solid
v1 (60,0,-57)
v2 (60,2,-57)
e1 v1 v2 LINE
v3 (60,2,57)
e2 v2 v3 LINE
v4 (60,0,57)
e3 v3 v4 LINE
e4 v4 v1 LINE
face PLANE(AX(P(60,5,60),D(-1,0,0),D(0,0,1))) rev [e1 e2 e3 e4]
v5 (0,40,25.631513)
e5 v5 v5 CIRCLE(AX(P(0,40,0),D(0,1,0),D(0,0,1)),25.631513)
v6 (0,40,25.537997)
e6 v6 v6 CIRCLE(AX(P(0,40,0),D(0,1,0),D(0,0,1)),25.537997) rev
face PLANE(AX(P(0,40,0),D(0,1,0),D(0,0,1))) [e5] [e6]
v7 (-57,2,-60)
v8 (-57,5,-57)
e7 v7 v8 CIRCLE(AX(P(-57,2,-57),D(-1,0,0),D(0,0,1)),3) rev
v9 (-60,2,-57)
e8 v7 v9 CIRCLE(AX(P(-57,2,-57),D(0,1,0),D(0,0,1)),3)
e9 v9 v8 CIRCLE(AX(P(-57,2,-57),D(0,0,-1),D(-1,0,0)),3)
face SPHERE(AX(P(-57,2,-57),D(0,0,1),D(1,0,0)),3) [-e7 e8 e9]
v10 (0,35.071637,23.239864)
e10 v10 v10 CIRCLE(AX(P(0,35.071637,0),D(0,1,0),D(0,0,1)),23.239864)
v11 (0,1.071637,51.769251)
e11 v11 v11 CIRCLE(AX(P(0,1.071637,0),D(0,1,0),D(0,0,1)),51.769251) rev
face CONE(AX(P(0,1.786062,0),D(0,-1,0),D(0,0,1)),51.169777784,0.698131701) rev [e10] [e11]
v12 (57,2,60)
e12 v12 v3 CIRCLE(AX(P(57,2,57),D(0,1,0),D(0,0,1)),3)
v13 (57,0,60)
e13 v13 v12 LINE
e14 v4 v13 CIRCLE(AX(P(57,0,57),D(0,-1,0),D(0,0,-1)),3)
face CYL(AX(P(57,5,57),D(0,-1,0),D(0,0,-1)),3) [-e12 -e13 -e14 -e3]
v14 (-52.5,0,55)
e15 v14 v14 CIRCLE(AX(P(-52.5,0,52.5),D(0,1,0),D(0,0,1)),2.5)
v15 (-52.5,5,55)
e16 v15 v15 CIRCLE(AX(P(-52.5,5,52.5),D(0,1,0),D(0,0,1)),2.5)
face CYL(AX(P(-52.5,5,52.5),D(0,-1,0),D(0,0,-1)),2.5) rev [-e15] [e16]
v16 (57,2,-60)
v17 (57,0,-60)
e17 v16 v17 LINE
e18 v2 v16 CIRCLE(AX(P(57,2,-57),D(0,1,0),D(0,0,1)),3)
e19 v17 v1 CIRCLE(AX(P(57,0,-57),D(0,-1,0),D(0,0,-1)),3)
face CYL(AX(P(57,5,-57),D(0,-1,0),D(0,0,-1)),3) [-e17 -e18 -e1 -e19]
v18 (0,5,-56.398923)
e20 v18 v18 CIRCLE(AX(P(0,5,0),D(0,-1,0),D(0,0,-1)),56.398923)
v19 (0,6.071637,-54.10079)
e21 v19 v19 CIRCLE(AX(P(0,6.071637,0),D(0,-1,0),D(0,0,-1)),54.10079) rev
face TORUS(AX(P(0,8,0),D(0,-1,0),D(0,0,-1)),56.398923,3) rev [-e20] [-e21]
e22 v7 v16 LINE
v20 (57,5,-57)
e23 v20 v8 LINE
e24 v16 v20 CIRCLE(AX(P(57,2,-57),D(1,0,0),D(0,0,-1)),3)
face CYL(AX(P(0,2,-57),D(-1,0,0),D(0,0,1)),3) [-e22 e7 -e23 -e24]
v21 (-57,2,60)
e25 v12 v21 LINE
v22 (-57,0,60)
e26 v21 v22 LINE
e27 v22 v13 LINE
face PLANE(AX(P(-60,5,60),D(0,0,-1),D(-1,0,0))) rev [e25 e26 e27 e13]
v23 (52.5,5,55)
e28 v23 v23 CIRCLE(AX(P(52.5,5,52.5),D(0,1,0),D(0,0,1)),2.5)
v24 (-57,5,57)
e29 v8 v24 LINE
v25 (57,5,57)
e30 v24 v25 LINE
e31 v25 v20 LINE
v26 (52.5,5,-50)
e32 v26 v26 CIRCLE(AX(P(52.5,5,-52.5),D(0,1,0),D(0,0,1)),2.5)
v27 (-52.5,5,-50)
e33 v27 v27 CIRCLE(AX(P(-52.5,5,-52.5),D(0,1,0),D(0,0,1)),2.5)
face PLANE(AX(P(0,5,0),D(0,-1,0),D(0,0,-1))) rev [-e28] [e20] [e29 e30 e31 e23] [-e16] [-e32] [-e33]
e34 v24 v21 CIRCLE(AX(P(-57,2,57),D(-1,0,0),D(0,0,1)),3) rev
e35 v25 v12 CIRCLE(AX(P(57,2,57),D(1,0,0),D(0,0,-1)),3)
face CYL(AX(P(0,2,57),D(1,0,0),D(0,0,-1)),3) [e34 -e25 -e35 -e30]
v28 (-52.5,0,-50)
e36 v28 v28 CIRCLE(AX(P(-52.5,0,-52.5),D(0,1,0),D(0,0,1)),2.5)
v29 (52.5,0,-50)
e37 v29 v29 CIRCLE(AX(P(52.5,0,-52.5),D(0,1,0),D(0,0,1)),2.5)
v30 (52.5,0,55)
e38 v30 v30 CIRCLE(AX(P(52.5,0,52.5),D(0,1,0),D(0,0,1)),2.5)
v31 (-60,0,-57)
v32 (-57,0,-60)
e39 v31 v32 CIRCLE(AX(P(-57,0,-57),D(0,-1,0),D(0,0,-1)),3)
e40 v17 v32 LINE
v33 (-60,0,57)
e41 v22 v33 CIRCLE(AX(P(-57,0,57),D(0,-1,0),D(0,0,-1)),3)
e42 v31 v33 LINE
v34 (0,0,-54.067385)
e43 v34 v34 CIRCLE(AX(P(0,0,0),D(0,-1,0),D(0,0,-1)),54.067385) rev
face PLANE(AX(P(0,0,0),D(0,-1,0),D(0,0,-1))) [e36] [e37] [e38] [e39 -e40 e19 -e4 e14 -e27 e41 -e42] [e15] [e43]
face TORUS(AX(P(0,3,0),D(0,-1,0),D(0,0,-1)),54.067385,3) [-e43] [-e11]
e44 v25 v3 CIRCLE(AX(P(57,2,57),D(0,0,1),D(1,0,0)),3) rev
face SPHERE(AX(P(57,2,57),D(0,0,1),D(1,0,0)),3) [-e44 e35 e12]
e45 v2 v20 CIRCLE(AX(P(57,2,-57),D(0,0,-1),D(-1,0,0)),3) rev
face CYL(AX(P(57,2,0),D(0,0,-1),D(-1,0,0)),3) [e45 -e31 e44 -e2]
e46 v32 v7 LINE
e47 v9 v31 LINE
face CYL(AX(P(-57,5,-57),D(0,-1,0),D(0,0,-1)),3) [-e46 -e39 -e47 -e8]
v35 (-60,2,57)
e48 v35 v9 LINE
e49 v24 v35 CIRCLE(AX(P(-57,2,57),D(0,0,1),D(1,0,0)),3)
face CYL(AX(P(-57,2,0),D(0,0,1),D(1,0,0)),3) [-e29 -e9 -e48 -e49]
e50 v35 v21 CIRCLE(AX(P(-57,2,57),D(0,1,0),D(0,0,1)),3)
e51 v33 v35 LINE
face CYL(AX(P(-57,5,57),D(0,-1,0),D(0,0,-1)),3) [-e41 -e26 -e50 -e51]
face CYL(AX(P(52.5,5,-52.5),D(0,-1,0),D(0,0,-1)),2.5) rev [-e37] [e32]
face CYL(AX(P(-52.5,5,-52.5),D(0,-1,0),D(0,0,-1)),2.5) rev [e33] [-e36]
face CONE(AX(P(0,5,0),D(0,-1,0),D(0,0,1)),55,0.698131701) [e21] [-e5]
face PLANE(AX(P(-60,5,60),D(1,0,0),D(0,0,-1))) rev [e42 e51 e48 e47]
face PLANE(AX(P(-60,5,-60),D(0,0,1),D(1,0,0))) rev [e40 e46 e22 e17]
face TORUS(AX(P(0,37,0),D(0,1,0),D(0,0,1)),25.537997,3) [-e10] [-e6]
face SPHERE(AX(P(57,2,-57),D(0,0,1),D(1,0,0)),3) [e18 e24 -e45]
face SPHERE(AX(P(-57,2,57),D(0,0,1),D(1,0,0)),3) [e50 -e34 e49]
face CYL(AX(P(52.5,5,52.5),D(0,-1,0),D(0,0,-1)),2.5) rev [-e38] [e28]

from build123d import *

# Parameters (mm, degrees)
SKETCH1_W           = 120
SKETCH1_H           = 120
SKETCH1_R           = 2.5
BOSS_EXTRUDE1_DEPTH = 5
SKETCH2_R           = 55
BOSS_EXTRUDE2_DEPTH = 35
BOSS_EXTRUDE2_TAPER = 40
FILLET1_R           = 3
FILLET2_R           = 3
FILLET3_R           = 3


# Read off the part's stored shape, not the designer's step: Shell1
with BuildPart() as part:
    # Sketch1 → Boss-Extrude1 (new body)
    with BuildSketch(Plane(origin=(0, 0, 0), x_dir=(1, 0, 0), z_dir=(0, 1, 0))):
        Rectangle(SKETCH1_W, SKETCH1_H)
        with Locations(Location((-52.5, 52.5, 0), (0, 0, 270))):
            Circle(SKETCH1_R, mode=Mode.SUBTRACT)
        with Locations(Location((52.5, 52.5, 0), (0, 0, 270))):
            Circle(SKETCH1_R, mode=Mode.SUBTRACT)
        with Locations(Location((52.5, -52.5, 0), (0, 0, 270))):
            Circle(SKETCH1_R, mode=Mode.SUBTRACT)
        with Locations(Location((-52.5, -52.5, 0), (0, 0, 270))):
            Circle(SKETCH1_R, mode=Mode.SUBTRACT)
    extrude(amount=BOSS_EXTRUDE1_DEPTH)

    # Sketch2 → Boss-Extrude2 (add)
    with BuildSketch(Plane(origin=(0, 5, 0), x_dir=(1, 0, 0), z_dir=(0, 1, 0))):
        Circle(SKETCH2_R)
    extrude(amount=BOSS_EXTRUDE2_DEPTH, taper=BOSS_EXTRUDE2_TAPER)

    # Shell1 outline → Shell1 (revolve, cut)
    with BuildSketch(Plane.XY):
        Polygon((0, 0), (52.668461709, 0), (19.104476462, 40), (0, 40), align=None)
    revolve(axis=Axis((0, 0, 0), (0, 1, 0)), mode=Mode.SUBTRACT)

    # Fillet1
    fillet1_edges = [part.edges().sort_by_distance(p)[0] for p in [
        (-55, 5, 0),
        (-19.104476462, 40, 0),
    ]]
    fillet(fillet1_edges, radius=FILLET1_R)

    # Fillet2
    fillet2_edges = [part.edges().sort_by_distance(p)[0] for p in [
        (-52.668461709, 0, 0),
    ]]
    fillet(fillet2_edges, radius=FILLET2_R)

    # Fillet3
    fillet3_edges = [part.edges().sort_by_distance(p)[0] for p in [
        (-60, 5, 0),
        (0, 5, 60),
        (60, 5, 0),
        (60, 2.5, 60),
        (-60, 2.5, 60),
        (-60, 2.5, -60),
        (60, 2.5, -60),
        (0, 5, -60),
    ]]
    fillet(fillet3_edges, radius=FILLET3_R)


solid = part.part
